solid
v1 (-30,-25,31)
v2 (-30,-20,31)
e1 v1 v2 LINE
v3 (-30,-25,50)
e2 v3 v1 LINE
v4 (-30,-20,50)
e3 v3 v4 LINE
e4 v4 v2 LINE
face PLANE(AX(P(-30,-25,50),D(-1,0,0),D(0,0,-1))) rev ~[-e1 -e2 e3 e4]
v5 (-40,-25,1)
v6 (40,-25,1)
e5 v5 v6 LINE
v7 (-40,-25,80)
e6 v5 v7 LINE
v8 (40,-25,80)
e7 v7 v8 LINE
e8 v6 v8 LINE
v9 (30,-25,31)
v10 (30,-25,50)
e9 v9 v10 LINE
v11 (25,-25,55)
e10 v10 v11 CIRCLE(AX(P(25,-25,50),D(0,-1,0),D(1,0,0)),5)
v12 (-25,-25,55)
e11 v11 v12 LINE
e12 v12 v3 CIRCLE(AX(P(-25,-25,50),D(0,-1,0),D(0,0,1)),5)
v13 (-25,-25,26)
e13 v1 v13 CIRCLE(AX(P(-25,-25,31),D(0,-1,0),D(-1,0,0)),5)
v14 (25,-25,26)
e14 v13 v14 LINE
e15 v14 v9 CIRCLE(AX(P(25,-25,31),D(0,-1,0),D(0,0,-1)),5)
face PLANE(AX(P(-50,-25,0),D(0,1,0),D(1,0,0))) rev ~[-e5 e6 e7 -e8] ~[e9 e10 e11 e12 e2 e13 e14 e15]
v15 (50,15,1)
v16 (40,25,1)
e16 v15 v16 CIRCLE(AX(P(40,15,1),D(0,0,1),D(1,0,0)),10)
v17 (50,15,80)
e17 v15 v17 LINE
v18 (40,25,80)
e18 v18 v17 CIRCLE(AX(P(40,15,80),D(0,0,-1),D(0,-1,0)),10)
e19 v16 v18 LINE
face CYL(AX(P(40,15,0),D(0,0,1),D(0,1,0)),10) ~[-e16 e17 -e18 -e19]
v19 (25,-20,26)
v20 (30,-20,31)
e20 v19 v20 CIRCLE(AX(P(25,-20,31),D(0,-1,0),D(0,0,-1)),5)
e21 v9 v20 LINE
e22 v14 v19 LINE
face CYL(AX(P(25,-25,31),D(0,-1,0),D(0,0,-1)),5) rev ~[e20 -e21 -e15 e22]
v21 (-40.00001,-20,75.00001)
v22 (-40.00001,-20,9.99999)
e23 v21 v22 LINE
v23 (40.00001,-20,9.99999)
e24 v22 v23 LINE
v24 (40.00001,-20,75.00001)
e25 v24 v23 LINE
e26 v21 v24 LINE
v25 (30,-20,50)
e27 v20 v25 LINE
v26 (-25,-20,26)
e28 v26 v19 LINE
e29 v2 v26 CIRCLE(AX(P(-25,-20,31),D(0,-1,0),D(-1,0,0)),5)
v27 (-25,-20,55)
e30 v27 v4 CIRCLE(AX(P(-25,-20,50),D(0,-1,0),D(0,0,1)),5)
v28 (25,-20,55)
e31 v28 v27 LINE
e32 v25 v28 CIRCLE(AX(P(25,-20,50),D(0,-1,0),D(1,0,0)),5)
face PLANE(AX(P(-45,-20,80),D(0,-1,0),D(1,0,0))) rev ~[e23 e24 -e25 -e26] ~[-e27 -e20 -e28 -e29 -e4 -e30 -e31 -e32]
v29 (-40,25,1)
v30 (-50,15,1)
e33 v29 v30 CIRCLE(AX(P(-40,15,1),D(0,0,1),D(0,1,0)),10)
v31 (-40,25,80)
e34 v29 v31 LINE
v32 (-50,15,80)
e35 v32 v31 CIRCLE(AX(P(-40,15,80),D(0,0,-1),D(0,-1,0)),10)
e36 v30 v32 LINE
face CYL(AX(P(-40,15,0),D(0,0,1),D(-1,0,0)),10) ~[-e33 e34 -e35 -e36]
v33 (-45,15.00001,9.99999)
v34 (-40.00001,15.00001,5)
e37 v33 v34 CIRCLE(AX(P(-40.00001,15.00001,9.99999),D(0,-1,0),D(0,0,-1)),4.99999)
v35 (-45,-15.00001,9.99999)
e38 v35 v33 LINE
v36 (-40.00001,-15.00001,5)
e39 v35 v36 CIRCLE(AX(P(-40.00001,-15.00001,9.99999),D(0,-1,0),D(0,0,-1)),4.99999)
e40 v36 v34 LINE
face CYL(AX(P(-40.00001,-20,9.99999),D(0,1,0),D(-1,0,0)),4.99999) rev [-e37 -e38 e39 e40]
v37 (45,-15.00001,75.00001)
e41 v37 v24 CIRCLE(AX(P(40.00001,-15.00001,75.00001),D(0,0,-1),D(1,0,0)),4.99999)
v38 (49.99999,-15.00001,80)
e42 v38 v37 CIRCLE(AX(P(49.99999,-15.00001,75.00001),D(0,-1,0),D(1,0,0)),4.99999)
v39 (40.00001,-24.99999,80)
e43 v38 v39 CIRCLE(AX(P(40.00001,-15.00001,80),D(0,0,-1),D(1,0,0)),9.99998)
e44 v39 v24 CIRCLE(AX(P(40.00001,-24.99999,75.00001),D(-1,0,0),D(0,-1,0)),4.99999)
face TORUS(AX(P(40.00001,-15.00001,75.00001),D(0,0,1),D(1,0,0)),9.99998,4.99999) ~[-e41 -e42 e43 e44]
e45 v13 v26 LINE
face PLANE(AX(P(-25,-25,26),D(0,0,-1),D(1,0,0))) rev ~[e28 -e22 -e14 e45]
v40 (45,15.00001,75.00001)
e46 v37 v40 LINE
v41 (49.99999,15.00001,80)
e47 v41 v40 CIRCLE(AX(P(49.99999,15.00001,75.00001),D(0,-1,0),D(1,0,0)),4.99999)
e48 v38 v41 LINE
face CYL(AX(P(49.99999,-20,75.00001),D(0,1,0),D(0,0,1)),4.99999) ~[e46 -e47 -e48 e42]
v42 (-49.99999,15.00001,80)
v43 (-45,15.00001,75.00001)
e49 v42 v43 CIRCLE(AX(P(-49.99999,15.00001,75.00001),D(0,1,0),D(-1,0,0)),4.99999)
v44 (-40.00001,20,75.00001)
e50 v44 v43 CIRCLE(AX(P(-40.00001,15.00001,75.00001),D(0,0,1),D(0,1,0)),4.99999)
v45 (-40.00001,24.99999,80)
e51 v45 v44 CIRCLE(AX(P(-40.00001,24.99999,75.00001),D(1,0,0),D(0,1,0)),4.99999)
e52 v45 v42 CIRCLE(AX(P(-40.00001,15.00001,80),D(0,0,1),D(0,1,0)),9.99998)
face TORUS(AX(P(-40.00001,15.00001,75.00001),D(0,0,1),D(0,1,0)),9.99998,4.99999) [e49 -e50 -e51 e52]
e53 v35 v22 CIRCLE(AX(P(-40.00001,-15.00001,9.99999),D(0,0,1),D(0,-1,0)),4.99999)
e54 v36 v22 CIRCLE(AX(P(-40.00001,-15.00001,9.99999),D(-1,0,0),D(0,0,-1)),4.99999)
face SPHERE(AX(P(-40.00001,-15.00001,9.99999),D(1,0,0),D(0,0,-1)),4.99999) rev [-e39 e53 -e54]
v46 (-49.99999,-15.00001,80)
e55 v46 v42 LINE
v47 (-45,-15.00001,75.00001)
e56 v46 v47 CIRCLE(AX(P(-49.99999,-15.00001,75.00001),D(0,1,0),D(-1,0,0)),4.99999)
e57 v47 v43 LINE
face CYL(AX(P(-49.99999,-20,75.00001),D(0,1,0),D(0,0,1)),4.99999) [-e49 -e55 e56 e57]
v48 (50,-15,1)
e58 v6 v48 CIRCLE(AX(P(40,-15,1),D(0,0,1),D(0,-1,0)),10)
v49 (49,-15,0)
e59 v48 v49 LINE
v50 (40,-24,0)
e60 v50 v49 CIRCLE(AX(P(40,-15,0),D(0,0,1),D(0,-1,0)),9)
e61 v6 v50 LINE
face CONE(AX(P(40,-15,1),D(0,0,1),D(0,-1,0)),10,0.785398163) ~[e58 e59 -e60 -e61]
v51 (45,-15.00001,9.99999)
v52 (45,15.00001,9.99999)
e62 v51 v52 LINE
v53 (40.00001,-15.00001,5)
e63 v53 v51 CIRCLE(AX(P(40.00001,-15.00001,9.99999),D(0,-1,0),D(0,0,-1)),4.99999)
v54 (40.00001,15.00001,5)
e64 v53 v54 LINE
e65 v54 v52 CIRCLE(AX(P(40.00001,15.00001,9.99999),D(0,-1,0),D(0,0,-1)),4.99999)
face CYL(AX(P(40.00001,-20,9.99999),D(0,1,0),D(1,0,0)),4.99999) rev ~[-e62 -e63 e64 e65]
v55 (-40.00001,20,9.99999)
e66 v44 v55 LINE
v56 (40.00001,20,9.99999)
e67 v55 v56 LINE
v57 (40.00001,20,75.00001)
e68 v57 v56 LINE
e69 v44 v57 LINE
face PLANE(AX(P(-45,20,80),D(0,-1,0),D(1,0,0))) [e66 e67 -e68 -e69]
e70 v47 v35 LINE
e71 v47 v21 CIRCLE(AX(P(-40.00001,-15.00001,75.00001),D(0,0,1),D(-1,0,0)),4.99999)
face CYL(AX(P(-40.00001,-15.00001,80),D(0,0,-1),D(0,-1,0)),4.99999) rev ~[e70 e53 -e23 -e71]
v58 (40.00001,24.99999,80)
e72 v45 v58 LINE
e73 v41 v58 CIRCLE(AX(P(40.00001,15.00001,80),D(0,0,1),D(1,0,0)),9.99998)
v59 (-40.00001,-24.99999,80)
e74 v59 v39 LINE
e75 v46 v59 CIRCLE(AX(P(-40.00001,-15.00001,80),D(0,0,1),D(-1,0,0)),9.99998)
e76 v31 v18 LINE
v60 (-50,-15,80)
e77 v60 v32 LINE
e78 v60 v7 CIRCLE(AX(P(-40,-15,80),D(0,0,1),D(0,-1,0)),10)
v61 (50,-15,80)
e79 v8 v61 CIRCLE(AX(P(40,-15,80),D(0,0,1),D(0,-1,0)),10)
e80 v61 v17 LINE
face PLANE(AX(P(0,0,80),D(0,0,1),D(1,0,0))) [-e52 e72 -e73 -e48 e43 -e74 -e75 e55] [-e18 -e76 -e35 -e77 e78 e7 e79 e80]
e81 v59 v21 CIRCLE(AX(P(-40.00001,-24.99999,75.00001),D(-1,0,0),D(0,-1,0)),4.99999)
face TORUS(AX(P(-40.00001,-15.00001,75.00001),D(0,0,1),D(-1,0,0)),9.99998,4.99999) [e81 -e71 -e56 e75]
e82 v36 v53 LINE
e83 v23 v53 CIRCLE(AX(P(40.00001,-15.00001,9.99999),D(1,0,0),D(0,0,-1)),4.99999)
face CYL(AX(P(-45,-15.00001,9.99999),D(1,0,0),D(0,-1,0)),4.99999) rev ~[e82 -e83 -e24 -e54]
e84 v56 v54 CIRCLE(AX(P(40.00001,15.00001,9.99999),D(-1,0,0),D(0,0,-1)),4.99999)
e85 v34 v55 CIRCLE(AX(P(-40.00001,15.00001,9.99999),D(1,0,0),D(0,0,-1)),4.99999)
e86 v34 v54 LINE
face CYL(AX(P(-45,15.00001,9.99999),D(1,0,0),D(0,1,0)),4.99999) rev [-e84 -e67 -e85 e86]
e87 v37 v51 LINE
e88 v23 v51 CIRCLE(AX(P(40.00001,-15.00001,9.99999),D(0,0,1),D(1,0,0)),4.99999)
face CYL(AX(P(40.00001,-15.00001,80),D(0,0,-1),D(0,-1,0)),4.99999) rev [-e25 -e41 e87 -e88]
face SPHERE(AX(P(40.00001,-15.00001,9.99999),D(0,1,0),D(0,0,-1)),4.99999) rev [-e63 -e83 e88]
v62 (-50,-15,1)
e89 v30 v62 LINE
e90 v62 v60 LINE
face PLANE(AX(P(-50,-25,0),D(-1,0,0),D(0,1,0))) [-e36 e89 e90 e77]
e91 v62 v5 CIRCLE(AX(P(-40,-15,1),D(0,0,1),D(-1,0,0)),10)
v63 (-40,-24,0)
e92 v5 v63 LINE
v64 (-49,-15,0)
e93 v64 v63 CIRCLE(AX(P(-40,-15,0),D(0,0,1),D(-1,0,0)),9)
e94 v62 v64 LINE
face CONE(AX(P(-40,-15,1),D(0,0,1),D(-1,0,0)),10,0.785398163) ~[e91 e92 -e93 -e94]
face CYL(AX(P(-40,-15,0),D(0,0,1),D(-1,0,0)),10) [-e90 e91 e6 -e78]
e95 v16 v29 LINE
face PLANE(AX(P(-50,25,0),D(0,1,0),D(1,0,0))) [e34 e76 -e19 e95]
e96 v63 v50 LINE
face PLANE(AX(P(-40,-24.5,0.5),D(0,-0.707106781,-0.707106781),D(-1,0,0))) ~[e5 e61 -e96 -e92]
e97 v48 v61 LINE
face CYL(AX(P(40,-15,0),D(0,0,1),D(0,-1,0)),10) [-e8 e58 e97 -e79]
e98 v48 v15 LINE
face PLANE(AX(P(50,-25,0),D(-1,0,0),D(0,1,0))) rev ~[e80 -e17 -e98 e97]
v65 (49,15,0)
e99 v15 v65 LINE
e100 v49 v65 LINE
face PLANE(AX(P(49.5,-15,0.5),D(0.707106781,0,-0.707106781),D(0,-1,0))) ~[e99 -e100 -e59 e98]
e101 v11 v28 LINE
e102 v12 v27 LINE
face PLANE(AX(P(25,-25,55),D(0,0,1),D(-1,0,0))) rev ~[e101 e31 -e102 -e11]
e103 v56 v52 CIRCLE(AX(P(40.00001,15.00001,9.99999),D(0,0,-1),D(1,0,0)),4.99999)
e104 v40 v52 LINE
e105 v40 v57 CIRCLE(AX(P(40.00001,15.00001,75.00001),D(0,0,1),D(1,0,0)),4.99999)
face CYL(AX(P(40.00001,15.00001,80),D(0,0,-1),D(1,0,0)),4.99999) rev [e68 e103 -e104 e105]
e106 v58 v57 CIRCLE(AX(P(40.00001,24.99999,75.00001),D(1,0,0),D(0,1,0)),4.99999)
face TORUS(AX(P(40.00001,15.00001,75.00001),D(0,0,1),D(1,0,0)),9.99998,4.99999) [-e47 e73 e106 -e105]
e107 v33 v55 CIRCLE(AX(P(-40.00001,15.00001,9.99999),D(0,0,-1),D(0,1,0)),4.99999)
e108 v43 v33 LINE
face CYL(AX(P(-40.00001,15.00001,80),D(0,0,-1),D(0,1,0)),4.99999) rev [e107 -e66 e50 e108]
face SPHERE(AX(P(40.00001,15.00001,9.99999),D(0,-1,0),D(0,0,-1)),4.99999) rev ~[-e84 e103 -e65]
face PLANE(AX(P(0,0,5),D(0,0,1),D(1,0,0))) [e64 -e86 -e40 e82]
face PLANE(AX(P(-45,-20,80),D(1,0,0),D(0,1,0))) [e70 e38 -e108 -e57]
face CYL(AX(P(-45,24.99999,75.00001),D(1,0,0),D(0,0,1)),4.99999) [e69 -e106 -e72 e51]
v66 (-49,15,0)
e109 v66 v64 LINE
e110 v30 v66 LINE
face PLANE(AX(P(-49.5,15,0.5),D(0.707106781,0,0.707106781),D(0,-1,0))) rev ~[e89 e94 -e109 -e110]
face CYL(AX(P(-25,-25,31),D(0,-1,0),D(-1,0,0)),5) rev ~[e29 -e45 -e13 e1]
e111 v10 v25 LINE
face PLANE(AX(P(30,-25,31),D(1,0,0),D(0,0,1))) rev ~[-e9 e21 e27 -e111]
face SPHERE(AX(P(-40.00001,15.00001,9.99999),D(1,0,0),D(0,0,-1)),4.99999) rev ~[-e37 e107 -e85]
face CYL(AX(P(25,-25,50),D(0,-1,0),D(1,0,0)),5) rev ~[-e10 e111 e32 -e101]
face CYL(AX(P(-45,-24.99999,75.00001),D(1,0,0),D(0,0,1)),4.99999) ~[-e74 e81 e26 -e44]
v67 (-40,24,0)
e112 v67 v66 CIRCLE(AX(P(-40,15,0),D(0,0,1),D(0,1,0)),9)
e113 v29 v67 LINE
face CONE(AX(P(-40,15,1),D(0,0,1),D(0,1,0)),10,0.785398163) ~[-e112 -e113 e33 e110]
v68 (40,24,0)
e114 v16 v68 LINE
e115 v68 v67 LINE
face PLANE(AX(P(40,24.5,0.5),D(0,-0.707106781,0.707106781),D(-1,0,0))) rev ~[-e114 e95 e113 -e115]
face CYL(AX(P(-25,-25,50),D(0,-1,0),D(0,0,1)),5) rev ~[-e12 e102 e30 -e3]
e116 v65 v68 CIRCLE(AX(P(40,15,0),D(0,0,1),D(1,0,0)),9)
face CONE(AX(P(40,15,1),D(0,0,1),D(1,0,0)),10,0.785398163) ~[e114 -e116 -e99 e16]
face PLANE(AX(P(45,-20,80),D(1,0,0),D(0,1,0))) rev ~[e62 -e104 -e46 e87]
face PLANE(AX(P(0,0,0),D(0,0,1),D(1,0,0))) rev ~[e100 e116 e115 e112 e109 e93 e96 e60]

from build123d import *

# Parameters (mm, degrees)
F0_W     = 100
F0_H     = 50
F1_DEPTH = 80
F2_W     = 90
F2_H     = 40
F3_DEPTH = 75
F4_R     = 4.99999
F5_R     = 10
F6_SIZE  = 1
F8_DEPTH = 5


# Not quite as in the source:
# - a fillet or chamfer is up to 0.001 mm smaller than in the source, because OpenCascade refuses the exact size


with BuildPart() as f1:
    # F0 (on Top) → F1 (new body)
    with BuildSketch(Plane.XY):
        Rectangle(F0_W, F0_H)
    extrude(amount=F1_DEPTH)

    # F2 (on face) → F3 (cut)
    with BuildSketch(Plane.XY.offset(80)):
        Rectangle(F2_W, F2_H)
    extrude(amount=-F3_DEPTH, mode=Mode.SUBTRACT)

    # F4 (radius 5 in the source; OpenCascade refuses exactly that, so slightly less here)
    f4_edges = [f1.edges().sort_by_distance(p)[0] for p in [
        (45, 0, 5),
        (0, 20, 5),
        (0, -20, 5),
        (-45, 0, 5),
        (-45, 20, 42.5),
        (-45, -20, 42.5),
        (45, 20, 42.5),
        (45, -20, 42.5),
        (45, 0, 80),
        (0, 20, 80),
        (-45, 0, 80),
        (0, -20, 80),
    ]]
    fillet(f4_edges, radius=F4_R)

    # F5
    f5_edges = [f1.edges().sort_by_distance(p)[0] for p in [
        (50, -25, 40),
        (-50, -25, 40),
        (-50, 25, 40),
        (50, 25, 40),
    ]]
    fillet(f5_edges, radius=F5_R)

    # F6
    f6_edges = [f1.edges().sort_by_distance(p)[0] for p in [
        (0, -25, 0),
        (47.071068, -22.071068, 0),
        (50, 0, 0),
        (47.071068, 22.071068, 0),
        (0, 25, 0),
        (-47.071068, 22.071068, 0),
        (-50, 0, 0),
        (-47.071068, -22.071068, 0),
    ]]
    chamfer(f6_edges, length=F6_SIZE)

    # F7 (on face) → F8 (cut)
    with BuildSketch(Plane.XZ.offset(25)):
        with BuildLine():
            Line((25, 55), (-25, 55))
            ThreePointArc((-25, 55), (-28.5355339059, 53.5355339059), (-30, 50))
            Line((-30, 50), (-30, 31))
            ThreePointArc((-30, 31), (-28.5355339059, 27.4644660941), (-25, 26))
            Line((-25, 26), (25, 26))
            ThreePointArc((25, 26), (28.5355339059, 27.4644660941), (30, 31))
            Line((30, 31), (30, 50))
            ThreePointArc((30, 50), (28.5355339059, 53.5355339059), (25, 55))
        make_face()
    extrude(amount=-F8_DEPTH, mode=Mode.SUBTRACT)


solid = f1.part
